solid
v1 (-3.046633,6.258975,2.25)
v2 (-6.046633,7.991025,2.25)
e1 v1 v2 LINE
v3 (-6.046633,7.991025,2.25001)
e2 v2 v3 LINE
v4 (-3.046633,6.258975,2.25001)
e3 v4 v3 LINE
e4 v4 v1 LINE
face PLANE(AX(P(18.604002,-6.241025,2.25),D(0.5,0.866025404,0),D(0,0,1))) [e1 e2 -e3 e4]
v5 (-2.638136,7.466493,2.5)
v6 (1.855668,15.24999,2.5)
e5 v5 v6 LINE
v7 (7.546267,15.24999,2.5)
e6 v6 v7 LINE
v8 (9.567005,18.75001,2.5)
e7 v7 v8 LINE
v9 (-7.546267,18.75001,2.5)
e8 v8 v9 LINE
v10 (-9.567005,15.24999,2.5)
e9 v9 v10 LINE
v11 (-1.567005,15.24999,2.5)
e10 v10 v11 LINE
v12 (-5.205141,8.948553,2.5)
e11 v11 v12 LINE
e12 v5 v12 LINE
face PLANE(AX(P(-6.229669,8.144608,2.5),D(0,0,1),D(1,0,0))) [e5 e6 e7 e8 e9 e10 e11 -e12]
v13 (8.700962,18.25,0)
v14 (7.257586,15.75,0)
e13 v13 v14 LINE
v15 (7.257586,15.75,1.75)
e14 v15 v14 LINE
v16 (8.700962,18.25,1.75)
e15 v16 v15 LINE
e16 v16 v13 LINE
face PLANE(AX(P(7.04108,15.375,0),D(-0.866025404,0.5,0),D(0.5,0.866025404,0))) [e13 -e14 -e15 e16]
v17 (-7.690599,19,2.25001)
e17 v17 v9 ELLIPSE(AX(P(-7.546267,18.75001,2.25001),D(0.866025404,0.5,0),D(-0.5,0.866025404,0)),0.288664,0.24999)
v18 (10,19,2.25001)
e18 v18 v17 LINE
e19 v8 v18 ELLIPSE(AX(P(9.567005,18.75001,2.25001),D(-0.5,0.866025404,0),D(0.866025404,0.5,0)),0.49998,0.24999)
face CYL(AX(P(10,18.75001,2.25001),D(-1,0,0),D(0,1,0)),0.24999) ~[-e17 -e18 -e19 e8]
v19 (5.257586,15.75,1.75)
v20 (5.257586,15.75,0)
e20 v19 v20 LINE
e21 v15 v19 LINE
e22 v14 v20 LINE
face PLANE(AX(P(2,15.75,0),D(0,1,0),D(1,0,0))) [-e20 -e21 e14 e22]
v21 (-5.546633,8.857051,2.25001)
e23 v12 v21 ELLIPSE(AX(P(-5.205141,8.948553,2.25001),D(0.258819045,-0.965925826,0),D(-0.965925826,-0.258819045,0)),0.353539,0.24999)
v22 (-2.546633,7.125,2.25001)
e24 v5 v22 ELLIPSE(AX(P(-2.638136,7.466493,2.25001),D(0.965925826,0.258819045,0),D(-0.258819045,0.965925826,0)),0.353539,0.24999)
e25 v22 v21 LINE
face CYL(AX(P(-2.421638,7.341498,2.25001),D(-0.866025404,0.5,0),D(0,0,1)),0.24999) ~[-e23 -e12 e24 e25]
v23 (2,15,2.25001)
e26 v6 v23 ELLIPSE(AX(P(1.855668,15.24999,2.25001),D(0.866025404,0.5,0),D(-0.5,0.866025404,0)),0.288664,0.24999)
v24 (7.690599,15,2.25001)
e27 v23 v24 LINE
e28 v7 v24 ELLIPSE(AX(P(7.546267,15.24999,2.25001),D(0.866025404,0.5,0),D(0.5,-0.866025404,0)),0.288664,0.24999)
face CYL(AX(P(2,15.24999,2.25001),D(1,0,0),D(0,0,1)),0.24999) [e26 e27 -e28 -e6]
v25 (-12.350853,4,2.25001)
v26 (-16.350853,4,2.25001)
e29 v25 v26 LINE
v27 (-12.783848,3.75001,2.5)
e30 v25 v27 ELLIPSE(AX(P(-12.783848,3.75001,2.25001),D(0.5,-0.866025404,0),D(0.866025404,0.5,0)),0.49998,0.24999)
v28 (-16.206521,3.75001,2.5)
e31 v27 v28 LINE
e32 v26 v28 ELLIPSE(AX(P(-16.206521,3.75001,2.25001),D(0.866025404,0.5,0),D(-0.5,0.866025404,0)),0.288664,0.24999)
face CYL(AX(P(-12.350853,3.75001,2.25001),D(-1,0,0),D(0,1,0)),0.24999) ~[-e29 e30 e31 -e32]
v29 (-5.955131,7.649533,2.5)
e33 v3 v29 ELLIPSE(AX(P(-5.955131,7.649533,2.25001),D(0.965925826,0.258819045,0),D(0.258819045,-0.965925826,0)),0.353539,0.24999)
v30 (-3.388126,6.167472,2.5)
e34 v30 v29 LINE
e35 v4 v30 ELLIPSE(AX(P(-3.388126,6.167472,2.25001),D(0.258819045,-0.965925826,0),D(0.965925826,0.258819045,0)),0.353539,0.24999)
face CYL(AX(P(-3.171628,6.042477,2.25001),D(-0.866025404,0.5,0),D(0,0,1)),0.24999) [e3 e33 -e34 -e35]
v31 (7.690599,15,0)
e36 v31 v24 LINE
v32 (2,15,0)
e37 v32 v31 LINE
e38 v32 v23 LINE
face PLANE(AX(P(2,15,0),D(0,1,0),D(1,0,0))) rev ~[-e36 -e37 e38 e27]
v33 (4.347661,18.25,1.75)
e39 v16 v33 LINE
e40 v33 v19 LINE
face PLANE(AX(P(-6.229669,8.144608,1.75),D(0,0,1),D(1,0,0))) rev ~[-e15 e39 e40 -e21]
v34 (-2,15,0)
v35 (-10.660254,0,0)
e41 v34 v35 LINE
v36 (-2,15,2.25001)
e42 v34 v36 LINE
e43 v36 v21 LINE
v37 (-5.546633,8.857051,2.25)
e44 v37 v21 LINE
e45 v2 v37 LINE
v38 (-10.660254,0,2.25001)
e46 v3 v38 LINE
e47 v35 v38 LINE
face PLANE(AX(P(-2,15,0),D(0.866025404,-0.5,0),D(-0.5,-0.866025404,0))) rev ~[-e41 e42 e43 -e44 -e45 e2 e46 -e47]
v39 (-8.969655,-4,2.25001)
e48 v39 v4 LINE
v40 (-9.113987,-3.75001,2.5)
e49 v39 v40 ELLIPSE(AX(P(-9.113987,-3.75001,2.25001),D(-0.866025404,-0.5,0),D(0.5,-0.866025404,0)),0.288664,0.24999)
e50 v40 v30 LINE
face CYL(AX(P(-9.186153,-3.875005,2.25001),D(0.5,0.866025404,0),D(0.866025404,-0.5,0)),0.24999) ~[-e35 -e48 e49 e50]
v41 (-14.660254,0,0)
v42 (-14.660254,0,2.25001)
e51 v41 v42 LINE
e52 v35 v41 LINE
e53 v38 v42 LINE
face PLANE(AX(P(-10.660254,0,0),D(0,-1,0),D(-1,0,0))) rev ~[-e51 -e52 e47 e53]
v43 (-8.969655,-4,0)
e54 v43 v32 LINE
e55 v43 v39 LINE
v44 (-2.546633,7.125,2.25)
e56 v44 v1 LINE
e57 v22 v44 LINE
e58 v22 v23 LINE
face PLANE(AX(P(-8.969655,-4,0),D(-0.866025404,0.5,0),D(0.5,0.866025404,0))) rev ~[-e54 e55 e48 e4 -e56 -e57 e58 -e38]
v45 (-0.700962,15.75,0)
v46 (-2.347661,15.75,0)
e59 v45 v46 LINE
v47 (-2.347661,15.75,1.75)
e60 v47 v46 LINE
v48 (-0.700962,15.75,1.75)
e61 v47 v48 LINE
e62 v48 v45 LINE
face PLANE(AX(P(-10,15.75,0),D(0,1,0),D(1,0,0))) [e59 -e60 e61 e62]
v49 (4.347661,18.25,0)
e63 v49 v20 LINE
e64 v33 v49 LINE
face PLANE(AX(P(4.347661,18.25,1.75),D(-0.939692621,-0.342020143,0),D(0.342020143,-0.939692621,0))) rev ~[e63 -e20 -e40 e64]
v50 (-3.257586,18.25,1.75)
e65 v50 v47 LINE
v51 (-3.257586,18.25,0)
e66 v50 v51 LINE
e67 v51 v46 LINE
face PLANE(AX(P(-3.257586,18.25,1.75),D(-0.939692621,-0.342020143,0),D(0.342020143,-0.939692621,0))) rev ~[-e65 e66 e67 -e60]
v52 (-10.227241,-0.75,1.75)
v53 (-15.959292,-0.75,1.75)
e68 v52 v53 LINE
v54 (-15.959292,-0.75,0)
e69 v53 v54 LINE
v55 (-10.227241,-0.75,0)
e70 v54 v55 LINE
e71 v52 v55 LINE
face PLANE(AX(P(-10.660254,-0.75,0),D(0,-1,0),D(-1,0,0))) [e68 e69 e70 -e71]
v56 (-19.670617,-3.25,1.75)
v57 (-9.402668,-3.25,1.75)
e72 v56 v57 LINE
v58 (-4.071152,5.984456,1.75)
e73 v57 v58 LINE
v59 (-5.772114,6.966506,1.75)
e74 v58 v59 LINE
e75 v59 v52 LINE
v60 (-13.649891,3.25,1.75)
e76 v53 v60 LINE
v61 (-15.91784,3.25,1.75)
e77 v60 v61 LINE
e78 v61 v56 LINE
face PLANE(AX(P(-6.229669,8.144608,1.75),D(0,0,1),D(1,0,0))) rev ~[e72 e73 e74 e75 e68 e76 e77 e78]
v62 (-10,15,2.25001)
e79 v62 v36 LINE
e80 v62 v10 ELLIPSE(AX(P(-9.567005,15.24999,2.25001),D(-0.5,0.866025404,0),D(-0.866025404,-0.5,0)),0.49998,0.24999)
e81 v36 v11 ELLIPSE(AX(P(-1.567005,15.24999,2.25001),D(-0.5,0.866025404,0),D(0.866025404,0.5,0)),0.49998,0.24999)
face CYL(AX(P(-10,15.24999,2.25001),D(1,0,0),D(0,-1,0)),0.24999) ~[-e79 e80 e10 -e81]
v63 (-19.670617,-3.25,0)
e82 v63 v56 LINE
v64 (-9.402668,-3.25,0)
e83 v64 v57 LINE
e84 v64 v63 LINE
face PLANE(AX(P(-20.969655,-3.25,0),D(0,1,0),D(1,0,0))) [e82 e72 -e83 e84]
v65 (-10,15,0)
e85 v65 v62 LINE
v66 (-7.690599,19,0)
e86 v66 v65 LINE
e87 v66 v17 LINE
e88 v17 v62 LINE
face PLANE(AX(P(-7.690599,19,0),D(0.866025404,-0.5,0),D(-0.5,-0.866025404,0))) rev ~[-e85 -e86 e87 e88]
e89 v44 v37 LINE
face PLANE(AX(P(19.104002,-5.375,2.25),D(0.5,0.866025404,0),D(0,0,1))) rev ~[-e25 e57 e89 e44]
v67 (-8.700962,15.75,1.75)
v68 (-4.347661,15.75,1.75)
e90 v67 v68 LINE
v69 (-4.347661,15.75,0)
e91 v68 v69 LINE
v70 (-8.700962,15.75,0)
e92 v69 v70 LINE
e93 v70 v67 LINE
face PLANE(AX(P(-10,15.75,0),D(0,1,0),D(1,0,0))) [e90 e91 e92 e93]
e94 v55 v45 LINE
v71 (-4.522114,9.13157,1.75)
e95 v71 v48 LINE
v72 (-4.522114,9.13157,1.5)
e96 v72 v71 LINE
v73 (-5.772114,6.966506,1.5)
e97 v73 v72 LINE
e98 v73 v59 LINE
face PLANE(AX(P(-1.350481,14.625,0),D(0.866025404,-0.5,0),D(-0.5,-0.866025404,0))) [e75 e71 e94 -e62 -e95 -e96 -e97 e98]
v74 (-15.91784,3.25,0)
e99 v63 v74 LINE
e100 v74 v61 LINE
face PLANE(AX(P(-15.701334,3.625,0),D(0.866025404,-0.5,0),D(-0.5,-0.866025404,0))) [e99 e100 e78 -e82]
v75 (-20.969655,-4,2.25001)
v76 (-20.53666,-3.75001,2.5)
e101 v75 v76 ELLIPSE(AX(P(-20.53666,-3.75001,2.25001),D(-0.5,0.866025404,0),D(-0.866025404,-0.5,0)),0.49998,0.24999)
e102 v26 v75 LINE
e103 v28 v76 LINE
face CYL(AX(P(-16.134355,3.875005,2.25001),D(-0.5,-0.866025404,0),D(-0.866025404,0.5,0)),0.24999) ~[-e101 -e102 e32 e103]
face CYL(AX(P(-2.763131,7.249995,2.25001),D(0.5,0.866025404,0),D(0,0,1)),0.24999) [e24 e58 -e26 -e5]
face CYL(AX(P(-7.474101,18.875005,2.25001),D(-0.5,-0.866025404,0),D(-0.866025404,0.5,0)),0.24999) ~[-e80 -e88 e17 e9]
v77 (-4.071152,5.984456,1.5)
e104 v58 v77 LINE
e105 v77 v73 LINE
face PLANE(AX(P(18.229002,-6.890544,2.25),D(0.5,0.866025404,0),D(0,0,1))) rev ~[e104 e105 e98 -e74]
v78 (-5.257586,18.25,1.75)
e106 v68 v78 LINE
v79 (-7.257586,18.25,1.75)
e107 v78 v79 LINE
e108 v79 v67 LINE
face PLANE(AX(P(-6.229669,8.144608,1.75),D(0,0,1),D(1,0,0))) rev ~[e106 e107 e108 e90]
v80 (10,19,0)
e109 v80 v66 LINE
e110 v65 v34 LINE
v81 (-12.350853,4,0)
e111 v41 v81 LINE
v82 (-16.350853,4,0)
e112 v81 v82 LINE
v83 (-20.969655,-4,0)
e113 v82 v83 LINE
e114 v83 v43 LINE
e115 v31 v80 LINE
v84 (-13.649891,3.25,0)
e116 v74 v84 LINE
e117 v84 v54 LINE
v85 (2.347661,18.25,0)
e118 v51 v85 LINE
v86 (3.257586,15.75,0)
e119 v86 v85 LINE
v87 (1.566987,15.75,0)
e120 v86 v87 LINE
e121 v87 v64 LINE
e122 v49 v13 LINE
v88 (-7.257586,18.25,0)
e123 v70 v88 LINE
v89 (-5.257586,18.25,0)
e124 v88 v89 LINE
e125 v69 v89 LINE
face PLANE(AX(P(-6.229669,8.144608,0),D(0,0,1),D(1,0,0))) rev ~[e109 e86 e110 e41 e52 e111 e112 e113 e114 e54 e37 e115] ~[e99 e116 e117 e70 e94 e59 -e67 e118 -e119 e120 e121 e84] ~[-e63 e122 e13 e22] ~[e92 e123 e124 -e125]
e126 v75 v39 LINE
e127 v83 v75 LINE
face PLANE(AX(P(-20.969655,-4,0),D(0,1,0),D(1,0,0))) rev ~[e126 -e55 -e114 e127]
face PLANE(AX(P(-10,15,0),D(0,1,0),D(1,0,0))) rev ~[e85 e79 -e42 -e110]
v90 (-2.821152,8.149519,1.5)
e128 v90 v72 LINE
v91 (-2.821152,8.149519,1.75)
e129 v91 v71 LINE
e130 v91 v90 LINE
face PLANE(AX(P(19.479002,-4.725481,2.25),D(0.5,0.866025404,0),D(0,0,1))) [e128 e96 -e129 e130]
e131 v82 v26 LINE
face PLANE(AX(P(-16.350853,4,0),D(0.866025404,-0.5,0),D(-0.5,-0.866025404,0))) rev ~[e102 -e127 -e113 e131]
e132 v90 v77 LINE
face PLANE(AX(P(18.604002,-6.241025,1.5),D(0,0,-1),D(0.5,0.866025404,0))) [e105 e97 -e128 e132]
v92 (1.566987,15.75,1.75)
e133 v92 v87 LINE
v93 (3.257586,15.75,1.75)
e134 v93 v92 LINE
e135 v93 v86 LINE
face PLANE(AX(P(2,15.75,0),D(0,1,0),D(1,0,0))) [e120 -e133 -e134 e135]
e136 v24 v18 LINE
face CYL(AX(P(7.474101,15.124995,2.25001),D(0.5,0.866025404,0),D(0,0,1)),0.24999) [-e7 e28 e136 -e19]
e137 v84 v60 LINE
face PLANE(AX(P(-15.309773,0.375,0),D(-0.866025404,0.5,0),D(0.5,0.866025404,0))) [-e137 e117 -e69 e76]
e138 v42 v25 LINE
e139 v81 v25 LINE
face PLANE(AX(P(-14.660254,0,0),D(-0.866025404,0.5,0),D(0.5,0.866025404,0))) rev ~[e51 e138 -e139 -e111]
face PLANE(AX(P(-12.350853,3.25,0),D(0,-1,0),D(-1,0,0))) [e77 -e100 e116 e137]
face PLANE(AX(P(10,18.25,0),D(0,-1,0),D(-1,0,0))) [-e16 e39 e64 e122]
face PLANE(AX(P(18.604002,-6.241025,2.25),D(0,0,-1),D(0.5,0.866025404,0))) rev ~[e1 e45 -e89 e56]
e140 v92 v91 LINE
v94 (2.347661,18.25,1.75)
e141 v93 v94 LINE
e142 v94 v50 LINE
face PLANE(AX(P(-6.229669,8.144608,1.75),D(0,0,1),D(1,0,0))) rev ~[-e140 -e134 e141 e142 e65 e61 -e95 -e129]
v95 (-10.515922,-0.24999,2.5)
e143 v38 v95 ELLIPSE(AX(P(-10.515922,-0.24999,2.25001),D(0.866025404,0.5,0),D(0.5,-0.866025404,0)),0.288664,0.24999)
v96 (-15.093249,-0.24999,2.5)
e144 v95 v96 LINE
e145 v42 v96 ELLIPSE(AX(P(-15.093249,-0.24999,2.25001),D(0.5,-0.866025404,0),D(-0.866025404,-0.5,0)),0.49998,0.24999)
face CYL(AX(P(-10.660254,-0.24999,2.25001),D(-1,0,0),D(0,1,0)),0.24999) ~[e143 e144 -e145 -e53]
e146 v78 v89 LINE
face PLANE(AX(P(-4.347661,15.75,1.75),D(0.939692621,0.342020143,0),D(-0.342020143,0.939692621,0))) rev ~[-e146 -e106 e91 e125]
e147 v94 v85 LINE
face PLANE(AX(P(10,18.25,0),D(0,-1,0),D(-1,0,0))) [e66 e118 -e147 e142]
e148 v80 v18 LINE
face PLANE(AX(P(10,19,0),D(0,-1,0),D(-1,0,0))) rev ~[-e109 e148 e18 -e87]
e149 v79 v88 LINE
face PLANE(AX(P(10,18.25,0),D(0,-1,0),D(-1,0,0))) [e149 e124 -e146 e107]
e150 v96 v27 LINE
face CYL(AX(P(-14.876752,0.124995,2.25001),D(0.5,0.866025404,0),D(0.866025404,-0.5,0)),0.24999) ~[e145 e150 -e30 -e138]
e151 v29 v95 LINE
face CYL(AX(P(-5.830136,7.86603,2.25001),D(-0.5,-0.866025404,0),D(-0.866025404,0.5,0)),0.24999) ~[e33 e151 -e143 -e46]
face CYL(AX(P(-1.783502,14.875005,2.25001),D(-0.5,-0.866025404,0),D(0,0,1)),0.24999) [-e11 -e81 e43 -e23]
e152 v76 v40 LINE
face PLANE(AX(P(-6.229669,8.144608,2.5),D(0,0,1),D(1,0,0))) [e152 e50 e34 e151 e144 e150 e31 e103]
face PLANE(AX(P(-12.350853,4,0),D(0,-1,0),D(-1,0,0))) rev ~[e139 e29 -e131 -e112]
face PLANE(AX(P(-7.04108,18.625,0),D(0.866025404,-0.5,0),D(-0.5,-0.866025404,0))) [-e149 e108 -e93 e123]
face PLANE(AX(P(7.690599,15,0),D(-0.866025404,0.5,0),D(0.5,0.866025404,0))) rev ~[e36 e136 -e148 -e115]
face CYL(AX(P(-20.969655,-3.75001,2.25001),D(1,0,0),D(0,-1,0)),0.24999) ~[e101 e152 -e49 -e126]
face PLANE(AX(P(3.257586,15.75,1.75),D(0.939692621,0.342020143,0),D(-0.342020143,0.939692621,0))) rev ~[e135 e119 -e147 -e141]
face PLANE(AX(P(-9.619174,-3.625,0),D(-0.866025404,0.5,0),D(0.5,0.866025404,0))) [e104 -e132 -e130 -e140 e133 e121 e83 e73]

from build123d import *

# Parameters (mm, degrees)
F1_DEPTH = 2.5
F4_W     = 1
F4_H     = 5.3799478337
F5_DEPTH = 100
F6_T     = -0.75
F7_R     = 0.24999
F9_DEPTH = 1.75


# Not quite as in the source:
# - a fillet or chamfer is up to 0.001 mm smaller than in the source, because OpenCascade refuses the exact size


with BuildPart() as f1:
    # F0 (on Top) → F1 (new body)
    with BuildSketch(Plane.XY):
        Polygon((-7.6905989232, 19), (-10, 15), (-2, 15), (-10.6602540378, 0), (-14.6602540378, 0), (-12.3508529611, 4), (-16.3508529611, 4), (-20.9696551146, -4), (-8.9696551146, -4), (2, 15), (7.6905989232, 15), (10, 19), align=None)
    extrude(amount=F1_DEPTH)

    # F4 (on offset) → F5 (cut)
    with BuildSketch(Plane(origin=(16.6554445662, -9.6160254038, 0), x_dir=(0.5, 0.8660254038, 0), z_dir=(0.8660254038, -0.5, 0))):
        with Locations((4.397114317, 4.9399739169)):
            Rectangle(F4_W, F4_H)
    extrude(amount=-F5_DEPTH, mode=Mode.SUBTRACT)

    # F6
    f6_openings = [f1.faces().sort_by_distance(p)[0] for p in [
        (-8.51122, 16.807119, 0),
    ]]
    offset(amount=F6_T, openings=f6_openings, kind=Kind.INTERSECTION)

    # F7 (radius 0.25 in the source; OpenCascade refuses exactly that, so slightly less here)
    f7_edges = [f1.edges().sort_by_distance(p)[0] for p in [
        (-0.273317, 11.0625, 2.5),
        (4.845299, 15, 2.5),
        (8.845299, 17, 2.5),
        (1.154701, 19, 2.5),
        (-8.845299, 17, 2.5),
        (-6, 15, 2.5),
        (-3.773317, 11.928525, 2.5),
        (-4.046633, 7.991025, 2.5),
        (-8.353444, 3.995513, 2.5),
        (-12.660254, 0, 2.5),
        (-13.505553, 2, 2.5),
        (-14.350853, 4, 2.5),
        (-18.660254, 0, 2.5),
        (-14.969655, -4, 2.5),
        (-6.008144, 1.129487, 2.5),
        (-4.546633, 7.125, 2.5),
    ]]
    fillet(f7_edges, radius=F7_R)

    # F8 (on face) → F9 (join, through all)
    with BuildSketch(Plane(origin=(0, 0, 1.75), x_dir=(1, 0, 0), z_dir=(0, 0, -1))):
        Polygon((-4.3476606357, -15.75), (-5.2575862213, -18.25), (-3.2575862213, -18.25), (-2.3476606357, -15.75), align=None)
        Polygon((3.2575862213, -15.75), (2.3476606357, -18.25), (4.3476606357, -18.25), (5.2575862213, -15.75), align=None)
    extrude(amount=F9_DEPTH)


solid = f1.part
